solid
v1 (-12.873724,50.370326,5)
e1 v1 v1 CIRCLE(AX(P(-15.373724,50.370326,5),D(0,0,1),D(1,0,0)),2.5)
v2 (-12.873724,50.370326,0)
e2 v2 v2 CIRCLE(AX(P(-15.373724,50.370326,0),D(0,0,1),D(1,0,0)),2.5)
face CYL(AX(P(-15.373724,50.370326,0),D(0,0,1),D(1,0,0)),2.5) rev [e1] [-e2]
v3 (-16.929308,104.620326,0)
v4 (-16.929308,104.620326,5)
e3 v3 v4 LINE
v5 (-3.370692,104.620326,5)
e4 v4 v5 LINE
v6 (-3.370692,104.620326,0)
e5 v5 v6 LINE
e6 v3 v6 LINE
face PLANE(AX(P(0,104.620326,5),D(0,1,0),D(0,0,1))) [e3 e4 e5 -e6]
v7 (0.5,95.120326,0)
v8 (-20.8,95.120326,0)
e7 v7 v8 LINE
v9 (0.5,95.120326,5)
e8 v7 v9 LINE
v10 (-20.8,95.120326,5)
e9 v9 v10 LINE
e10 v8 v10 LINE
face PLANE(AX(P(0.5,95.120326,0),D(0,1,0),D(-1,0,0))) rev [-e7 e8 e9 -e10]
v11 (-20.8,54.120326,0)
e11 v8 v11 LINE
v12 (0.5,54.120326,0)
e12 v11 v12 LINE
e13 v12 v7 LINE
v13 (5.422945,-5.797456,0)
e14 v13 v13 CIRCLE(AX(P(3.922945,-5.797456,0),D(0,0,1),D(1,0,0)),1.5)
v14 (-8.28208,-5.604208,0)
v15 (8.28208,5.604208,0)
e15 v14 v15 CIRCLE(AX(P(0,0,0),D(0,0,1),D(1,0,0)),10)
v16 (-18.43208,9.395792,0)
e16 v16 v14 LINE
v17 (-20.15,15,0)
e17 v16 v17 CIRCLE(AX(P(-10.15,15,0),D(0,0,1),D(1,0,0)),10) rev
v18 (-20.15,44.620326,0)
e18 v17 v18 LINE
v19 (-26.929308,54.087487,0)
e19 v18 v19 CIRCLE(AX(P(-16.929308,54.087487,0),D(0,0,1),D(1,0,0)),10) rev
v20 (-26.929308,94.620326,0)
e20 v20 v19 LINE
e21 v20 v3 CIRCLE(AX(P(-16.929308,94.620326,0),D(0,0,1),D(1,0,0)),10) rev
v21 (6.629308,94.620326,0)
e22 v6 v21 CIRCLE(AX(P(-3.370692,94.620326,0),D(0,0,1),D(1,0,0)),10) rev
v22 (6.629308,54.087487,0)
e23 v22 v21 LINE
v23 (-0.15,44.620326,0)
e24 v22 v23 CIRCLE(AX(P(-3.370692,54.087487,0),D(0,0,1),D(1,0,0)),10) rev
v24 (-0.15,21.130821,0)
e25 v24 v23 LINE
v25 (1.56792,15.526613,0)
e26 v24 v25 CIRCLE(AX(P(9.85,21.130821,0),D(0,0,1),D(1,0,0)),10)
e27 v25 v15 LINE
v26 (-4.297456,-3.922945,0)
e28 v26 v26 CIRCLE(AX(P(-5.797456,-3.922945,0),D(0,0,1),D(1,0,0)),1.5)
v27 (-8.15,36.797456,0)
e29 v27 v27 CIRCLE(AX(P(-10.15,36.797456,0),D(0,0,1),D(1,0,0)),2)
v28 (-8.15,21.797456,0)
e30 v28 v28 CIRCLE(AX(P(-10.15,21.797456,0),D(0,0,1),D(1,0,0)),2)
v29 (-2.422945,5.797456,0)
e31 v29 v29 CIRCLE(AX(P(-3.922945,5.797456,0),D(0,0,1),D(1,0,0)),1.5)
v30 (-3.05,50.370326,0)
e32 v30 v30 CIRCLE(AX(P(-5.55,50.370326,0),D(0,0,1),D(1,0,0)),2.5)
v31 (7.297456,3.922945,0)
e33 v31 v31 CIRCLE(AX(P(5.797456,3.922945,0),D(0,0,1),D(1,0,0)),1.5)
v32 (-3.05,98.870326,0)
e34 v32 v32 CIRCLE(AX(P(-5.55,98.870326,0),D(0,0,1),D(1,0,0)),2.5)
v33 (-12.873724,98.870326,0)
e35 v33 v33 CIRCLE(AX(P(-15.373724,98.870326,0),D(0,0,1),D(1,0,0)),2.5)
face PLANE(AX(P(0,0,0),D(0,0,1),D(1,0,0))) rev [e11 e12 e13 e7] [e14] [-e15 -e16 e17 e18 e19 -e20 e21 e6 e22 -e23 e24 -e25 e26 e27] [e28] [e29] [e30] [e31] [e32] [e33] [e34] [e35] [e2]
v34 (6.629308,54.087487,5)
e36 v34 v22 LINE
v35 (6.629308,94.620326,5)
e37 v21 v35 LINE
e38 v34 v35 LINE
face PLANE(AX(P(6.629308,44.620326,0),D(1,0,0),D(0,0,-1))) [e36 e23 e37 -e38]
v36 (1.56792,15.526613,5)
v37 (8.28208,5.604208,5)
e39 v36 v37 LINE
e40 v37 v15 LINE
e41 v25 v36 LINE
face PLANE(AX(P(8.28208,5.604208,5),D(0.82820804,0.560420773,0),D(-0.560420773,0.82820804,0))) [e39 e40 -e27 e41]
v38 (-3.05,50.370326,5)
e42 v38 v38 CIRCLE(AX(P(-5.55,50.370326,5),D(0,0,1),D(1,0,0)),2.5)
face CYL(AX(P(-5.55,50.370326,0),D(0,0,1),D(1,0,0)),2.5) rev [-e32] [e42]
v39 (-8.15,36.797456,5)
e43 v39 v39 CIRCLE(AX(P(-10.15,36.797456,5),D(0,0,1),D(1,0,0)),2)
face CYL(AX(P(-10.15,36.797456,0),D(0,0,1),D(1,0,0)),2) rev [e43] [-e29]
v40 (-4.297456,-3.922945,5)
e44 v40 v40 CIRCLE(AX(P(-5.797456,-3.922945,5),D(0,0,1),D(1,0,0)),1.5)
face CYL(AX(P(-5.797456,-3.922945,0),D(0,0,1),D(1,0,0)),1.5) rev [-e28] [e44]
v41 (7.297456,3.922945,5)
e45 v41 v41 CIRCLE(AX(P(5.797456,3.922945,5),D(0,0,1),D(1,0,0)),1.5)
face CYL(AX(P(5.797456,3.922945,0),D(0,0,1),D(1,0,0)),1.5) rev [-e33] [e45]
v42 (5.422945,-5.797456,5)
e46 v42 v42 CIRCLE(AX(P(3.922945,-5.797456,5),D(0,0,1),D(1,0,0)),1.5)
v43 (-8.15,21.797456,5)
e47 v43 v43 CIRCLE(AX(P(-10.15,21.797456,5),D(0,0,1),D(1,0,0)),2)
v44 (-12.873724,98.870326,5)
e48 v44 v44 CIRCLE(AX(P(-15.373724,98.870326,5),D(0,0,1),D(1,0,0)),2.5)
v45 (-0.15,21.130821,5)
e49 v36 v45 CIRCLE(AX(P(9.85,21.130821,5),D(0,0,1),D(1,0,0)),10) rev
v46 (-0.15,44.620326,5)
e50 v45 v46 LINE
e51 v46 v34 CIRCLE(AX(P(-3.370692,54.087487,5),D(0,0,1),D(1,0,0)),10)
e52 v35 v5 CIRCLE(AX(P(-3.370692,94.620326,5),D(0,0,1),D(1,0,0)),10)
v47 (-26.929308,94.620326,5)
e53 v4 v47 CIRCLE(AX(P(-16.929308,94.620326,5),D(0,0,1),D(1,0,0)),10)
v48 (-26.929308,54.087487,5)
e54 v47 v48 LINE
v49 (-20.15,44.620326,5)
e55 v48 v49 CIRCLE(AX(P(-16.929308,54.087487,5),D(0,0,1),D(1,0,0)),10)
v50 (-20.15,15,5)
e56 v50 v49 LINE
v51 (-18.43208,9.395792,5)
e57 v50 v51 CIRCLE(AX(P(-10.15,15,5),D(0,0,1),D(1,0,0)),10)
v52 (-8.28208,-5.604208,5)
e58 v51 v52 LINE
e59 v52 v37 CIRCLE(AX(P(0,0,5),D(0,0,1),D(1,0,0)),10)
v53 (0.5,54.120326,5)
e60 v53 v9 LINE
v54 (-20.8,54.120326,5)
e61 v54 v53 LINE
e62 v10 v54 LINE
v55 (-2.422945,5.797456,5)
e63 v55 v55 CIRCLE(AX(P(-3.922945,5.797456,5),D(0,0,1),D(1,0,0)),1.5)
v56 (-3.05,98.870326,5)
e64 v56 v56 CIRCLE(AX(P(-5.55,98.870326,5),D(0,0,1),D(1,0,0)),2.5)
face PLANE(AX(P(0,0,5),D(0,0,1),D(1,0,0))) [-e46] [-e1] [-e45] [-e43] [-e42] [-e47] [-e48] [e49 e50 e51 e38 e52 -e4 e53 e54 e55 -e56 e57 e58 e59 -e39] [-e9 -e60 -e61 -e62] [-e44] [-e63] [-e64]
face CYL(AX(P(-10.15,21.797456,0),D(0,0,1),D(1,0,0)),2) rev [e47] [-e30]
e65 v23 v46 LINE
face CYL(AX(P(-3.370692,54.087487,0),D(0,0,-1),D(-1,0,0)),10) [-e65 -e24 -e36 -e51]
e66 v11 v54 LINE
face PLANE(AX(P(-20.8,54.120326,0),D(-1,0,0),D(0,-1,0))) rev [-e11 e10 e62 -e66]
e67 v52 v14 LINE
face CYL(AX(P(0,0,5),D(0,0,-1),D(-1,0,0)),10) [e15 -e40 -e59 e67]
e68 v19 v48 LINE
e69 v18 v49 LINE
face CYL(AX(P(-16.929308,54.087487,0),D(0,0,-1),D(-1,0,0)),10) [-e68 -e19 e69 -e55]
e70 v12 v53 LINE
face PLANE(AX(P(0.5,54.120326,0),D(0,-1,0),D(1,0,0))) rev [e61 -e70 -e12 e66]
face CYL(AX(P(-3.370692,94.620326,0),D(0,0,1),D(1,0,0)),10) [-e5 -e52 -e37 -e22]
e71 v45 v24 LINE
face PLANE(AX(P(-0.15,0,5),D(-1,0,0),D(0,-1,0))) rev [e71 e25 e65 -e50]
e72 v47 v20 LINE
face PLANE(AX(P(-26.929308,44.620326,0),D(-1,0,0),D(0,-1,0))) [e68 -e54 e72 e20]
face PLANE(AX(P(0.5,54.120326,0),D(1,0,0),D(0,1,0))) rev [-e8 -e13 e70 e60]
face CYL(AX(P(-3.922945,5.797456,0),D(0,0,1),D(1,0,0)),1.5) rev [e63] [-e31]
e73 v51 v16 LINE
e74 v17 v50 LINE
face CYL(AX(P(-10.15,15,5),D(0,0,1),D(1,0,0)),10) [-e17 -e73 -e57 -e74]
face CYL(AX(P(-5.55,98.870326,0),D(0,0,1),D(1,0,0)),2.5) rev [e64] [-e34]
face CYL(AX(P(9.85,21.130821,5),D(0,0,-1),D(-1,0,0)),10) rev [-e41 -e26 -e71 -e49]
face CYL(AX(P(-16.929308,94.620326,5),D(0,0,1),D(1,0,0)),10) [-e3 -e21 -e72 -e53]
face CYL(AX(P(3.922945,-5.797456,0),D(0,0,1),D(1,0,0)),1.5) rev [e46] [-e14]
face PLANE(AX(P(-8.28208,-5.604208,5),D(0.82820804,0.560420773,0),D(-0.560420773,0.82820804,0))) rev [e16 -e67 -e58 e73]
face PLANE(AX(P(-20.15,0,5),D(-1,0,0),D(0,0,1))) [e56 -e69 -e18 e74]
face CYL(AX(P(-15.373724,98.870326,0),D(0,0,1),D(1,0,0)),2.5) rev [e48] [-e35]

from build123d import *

# Parameters (mm, degrees)
BOSS_EXTRUDE1_DEPTH = 5
SKETCH4_W           = 33.55861501
SKETCH4_H           = 60
BOSS_EXTRUDE2_DEPTH = 5
SKETCH3_R           = 2.5
SKETCH3_W           = 21.3
SKETCH3_H           = 41
CUT_EXTRUDE1_DEPTH  = 5
FILLET1_R           = 10
SKETCH2_R           = 1.5
SKETCH2_R_2         = 2
CUT_EXTRUDE2_DEPTH  = 5
FILLET2_R           = 10


with BuildPart() as part:
    # Sketch1 → Boss-Extrude1 (new body)
    with BuildSketch(Plane.XY):
        with BuildLine():
            Line((-20.15, 104.620325978), (-20.15, 11.934589711))
            Line((-20.15, 11.934589711), (-8.282080395, -5.604207734))
            ThreePointArc((-8.282080395, -5.604207734), (-4.754289632, -8.797541139), (-0.15, -9.998874937))
            ThreePointArc((-0.15, -9.998874937), (8.797541139, -4.754289632), (8.282080395, 5.604207734))
            Line((8.282080395, 5.604207734), (-0.15, 18.065410289))
            Line((-0.15, 18.065410289), (-0.15, 104.620325978))
            Line((-0.15, 104.620325978), (-20.15, 104.620325978))
        make_face()
    extrude(amount=BOSS_EXTRUDE1_DEPTH)

    # Sketch4 → Boss-Extrude2 (add)
    with BuildSketch(Plane.XY.offset(5)):
        with Locations((-10.15, 74.620325978)):
            Rectangle(SKETCH4_W, SKETCH4_H)
    extrude(amount=-BOSS_EXTRUDE2_DEPTH)

    # Sketch3 → Cut-Extrude1 (cut)
    with BuildSketch(Plane.XY.offset(5)):
        with Locations((-5.55, 50.370325978)):
            Circle(SKETCH3_R)
        with Locations((-15.37372371, 50.370325978)):
            Circle(SKETCH3_R)
        with Locations((-15.37372371, 98.870325978)):
            Circle(SKETCH3_R)
        with Locations((-5.55, 98.870325978)):
            Circle(SKETCH3_R)
        with Locations((-10.15, 74.620325978)):
            Rectangle(SKETCH3_W, SKETCH3_H)
    extrude(amount=-CUT_EXTRUDE1_DEPTH, mode=Mode.SUBTRACT)

    # Fillet1
    # the kernel refuses this fillet: 10 mm, written as the material it takes off along each edge
    with BuildSketch(Plane(origin=(-26.929307505, 104.620325978, 30), x_dir=(1, 0, 0), z_dir=(0, 0, -1))) as fillet1_piece_1:
        with BuildLine():
            CenterArc((FILLET1_R, FILLET1_R), FILLET1_R, 180, 90)
            Line((0, FILLET1_R), (-FILLET1_R * 0.02, FILLET1_R))
            Line((-FILLET1_R * 0.02, FILLET1_R), (-FILLET1_R * 0.02, -FILLET1_R * 0.02))
            Line((-FILLET1_R * 0.02, -FILLET1_R * 0.02), (FILLET1_R, -FILLET1_R * 0.02))
            Line((FILLET1_R, -FILLET1_R * 0.02), (FILLET1_R, 0))
        make_face()
    extrude(amount=55, mode=Mode.SUBTRACT)
    with BuildSketch(Plane(origin=(6.629307505, 104.620325978, 30), x_dir=(-1, 0, 0), z_dir=(0, 0, -1))) as fillet1_piece_2:
        with BuildLine():
            CenterArc((FILLET1_R, -FILLET1_R), FILLET1_R, 90, 90)
            Line((0, -FILLET1_R), (-FILLET1_R * 0.02, -FILLET1_R))
            Line((-FILLET1_R * 0.02, -FILLET1_R), (-FILLET1_R * 0.02, FILLET1_R * 0.02))
            Line((-FILLET1_R * 0.02, FILLET1_R * 0.02), (FILLET1_R, FILLET1_R * 0.02))
            Line((FILLET1_R, FILLET1_R * 0.02), (FILLET1_R, 0))
        make_face()
    extrude(amount=55, mode=Mode.SUBTRACT)
    with BuildSketch(Plane(origin=(6.629307505, 44.620325978, 28.667902824), x_dir=(0, 1, 0), z_dir=(0, 0, -1))) as fillet1_piece_3:
        with BuildLine():
            CenterArc((9.46716113, -10), FILLET1_R, 90, 71.211889426)
            Line((0, -6.779307505), (-0.189343223, -6.714893655))
            ThreePointArc((-0.189343223, -6.714893655), (-0.2, -3.389653753), (-0.2, 0))
            Line((-0.2, 0), (0, 0.2))
            Line((0, 0.2), (9.46716113, 0.2))
            Line((9.46716113, 0.2), (9.46716113, 0))
        make_face()
    extrude(amount=52.335805648, mode=Mode.SUBTRACT)
    with BuildSketch(Plane(origin=(-26.929307505, 44.620325978, 28.667902824), x_dir=(0, 1, 0), z_dir=(0, 0, -1))) as fillet1_piece_4:
        with BuildLine():
            CenterArc((9.46716113, 10), FILLET1_R, 198.788110574, 71.211889426)
            Line((0, 6.779307505), (-0.189343223, 6.714893655))
            ThreePointArc((-0.189343223, 6.714893655), (-0.2, 3.389653753), (-0.2, 0))
            Line((-0.2, 0), (0, -0.2))
            Line((0, -0.2), (9.46716113, -0.2))
            Line((9.46716113, -0.2), (9.46716113, 0))
        make_face()
    extrude(amount=52.335805648, mode=Mode.SUBTRACT)

    # Sketch2 → Cut-Extrude2 (cut)
    with BuildSketch(Plane.XY.offset(5)):
        with Locations((-3.922945414, 5.797456277)):
            Circle(SKETCH2_R)
        with Locations((5.797456277, 3.922945414)):
            Circle(SKETCH2_R)
        with Locations((3.922945414, -5.797456277)):
            Circle(SKETCH2_R)
        with Locations((-5.797456277, -3.922945414)):
            Circle(SKETCH2_R)
        with Locations((-10.15, 21.797456277)):
            Circle(SKETCH2_R_2)
        with Locations((-10.15, 36.797456277)):
            Circle(SKETCH2_R_2)
    extrude(amount=-CUT_EXTRUDE2_DEPTH, mode=Mode.SUBTRACT)

    # Fillet2
    fillet2_edges = [part.edges().sort_by_distance(p)[0] for p in [
        (-20.15, 11.934589711, 2.5),
        (-0.15, 18.065410289, 2.5),
    ]]
    fillet(fillet2_edges, radius=FILLET2_R)


solid = part.part
